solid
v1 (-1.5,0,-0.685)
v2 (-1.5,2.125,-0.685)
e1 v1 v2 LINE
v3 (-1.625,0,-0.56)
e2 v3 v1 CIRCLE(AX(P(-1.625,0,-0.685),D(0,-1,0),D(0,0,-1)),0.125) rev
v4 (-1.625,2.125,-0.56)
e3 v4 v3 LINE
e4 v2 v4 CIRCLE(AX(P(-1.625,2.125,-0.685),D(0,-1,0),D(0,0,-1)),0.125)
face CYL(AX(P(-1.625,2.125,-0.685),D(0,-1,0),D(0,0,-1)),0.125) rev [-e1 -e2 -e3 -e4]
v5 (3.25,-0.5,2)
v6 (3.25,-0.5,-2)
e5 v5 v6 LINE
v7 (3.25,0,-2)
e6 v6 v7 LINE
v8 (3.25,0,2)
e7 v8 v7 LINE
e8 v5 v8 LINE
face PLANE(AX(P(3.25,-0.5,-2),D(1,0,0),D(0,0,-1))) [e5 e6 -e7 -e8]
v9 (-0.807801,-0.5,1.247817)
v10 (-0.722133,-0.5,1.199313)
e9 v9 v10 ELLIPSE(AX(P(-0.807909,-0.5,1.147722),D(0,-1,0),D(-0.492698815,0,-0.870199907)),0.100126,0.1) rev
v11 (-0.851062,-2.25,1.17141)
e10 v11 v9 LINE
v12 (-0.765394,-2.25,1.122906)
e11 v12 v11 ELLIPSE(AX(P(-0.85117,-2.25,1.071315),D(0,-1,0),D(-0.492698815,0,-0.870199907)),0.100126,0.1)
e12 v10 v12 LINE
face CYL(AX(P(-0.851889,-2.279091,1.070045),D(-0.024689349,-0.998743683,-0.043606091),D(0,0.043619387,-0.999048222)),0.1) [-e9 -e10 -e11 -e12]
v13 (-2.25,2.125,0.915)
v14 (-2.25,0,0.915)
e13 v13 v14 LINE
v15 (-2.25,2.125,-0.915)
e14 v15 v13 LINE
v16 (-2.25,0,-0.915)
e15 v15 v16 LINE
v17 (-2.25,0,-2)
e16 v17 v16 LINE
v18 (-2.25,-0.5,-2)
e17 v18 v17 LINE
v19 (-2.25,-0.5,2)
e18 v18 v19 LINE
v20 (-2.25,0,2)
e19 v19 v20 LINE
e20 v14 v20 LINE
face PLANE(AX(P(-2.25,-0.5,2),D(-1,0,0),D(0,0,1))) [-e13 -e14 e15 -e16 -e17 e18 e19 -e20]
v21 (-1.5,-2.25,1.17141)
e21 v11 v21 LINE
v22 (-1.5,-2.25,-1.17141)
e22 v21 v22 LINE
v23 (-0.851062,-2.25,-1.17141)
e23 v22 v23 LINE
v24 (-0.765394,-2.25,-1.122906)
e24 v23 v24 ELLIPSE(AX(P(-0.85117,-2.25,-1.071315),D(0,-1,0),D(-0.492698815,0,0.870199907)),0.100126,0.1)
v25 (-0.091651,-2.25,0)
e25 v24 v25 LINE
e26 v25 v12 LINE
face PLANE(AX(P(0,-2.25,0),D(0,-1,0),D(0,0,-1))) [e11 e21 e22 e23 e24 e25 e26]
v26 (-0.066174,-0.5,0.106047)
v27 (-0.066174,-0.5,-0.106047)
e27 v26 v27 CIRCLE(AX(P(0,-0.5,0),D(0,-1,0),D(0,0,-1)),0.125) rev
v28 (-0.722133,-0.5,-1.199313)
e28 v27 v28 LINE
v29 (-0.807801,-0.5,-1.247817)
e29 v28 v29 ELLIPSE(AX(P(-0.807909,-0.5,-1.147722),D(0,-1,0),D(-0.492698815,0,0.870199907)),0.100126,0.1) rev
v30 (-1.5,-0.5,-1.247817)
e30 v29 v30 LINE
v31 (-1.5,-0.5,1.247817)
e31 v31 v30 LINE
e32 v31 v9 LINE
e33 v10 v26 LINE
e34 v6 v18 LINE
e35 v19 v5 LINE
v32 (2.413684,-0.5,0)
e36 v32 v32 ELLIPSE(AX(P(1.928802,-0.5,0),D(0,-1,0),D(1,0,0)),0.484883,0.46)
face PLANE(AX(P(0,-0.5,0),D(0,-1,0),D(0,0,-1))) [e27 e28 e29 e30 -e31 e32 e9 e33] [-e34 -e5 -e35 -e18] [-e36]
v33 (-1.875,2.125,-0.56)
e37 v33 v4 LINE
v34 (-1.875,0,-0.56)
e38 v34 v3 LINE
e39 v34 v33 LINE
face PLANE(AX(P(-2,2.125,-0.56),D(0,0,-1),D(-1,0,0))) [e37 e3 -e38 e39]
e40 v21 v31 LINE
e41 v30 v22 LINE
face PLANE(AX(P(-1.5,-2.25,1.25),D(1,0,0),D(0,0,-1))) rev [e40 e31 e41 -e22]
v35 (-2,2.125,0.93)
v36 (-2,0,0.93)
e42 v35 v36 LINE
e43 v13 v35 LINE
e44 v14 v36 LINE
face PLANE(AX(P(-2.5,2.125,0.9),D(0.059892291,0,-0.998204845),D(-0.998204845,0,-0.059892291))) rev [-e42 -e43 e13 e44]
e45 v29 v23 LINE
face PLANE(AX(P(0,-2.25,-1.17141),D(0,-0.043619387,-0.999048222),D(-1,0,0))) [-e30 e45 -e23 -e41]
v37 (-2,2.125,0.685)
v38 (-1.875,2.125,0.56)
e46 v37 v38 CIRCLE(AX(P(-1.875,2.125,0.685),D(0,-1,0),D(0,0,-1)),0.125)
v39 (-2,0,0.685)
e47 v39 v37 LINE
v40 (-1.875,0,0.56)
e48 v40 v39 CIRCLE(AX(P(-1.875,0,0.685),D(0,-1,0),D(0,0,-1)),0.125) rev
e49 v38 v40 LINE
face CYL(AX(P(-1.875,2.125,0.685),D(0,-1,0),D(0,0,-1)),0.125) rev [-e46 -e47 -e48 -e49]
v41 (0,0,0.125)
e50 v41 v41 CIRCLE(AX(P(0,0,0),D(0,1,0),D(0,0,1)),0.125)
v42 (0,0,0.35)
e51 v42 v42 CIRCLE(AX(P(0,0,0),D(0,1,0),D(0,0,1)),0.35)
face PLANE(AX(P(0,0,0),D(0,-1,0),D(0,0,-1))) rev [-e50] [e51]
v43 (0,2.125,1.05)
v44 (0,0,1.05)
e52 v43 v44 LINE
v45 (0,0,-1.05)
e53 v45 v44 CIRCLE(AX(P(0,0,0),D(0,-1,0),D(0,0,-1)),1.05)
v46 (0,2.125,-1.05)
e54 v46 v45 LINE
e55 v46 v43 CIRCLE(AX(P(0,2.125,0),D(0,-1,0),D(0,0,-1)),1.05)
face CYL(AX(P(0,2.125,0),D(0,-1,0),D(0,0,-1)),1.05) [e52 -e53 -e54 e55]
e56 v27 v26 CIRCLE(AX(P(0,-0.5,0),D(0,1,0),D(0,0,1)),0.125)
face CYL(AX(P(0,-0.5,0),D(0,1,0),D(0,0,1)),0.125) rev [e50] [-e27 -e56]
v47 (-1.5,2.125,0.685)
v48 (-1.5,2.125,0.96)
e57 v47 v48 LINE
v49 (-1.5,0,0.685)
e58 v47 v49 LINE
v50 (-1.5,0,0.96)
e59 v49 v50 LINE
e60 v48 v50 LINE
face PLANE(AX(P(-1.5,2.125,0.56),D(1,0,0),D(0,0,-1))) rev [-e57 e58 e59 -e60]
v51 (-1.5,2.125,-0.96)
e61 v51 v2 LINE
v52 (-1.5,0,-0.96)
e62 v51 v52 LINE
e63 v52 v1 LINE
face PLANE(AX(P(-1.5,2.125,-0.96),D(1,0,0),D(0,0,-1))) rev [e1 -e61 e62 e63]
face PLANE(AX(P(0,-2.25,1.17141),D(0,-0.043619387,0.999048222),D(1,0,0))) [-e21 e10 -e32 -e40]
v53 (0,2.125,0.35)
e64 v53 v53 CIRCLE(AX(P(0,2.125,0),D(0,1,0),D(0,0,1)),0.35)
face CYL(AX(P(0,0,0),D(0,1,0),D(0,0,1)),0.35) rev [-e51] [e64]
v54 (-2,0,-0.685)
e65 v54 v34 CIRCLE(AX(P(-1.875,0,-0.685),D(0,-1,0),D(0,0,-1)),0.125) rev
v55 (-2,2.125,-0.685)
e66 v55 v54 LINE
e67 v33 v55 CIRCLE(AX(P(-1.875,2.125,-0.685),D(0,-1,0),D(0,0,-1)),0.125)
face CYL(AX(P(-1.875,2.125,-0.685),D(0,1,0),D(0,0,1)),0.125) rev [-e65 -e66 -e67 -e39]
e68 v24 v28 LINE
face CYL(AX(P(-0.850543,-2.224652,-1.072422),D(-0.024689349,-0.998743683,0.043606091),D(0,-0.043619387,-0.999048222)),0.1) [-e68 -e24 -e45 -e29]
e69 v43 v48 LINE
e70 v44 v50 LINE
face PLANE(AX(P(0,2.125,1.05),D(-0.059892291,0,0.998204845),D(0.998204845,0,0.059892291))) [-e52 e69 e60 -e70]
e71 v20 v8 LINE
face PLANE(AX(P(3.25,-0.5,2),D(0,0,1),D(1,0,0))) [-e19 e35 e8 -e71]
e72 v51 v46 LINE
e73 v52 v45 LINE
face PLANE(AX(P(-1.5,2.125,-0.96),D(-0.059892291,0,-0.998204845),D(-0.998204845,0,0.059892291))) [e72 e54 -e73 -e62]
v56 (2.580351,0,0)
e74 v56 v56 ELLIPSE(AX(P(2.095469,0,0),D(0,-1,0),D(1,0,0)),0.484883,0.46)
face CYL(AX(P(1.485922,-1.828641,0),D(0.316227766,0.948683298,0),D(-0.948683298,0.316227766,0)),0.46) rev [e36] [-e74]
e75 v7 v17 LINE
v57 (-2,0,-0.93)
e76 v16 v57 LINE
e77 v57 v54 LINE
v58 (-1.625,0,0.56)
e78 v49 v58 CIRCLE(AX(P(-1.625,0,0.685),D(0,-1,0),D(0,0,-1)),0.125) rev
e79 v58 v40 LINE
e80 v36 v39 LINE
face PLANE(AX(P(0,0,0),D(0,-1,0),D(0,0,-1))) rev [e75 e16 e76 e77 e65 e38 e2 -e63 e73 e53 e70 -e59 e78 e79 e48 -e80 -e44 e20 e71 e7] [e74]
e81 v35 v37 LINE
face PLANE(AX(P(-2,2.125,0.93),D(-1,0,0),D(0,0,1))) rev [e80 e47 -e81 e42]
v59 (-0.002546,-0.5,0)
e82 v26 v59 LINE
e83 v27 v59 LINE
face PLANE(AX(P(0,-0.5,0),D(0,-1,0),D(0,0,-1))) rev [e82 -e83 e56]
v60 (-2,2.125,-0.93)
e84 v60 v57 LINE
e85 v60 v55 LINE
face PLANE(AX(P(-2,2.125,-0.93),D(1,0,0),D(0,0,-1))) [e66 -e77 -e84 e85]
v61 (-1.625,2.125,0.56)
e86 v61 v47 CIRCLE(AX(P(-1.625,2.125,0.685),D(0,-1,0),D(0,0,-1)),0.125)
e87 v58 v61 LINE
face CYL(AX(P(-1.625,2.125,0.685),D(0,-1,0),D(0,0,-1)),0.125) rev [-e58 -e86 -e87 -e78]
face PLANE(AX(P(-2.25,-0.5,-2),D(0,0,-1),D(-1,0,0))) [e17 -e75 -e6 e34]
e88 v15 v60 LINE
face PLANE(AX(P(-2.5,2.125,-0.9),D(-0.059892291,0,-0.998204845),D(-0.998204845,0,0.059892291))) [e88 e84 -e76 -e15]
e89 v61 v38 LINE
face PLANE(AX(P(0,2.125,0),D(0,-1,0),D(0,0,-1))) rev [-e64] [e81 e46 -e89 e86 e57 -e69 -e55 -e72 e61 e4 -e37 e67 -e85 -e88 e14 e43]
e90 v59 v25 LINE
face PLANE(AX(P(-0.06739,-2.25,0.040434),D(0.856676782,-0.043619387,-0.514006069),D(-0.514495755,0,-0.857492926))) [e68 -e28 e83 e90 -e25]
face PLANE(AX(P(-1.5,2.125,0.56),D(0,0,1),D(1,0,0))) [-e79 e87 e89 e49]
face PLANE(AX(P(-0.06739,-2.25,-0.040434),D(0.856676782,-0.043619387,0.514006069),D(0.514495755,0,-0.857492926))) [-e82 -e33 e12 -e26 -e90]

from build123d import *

# Parameters (mm, degrees)
BOSS_EXTRUDE1_DEPTH     = 2.125
SKETCH4_R               = 0.35
THROUGH_HOLES_DEPTH     = 4.445014514
FILLET1_R               = 0.125
SKETCH5_R               = 0.125
BOSS_EXTRUDE2_DEPTH     = 0.5
SKETCH8_R               = 0.46
CUT_EXTRUDE1_DEPTH      = 5.582575695
CUT_EXTRUDE2_DEPTH      = 5.367851302
CUT_EXTRUDE2_DEPTH_BACK = 5.367851302
SKETCH9_W               = 1.465031661
SKETCH9_H               = 4
BOSS_EXTRUDE3_DEPTH     = 1.75
CHAMFER1_SIZE           = 1.8
CHAMFER1_SIZE_2         = 0.078589697
FILLET2_R               = 0.1


with BuildPart() as part:
    # Sketch3 → Boss-Extrude1 (new body)
    with BuildSketch(Plane(origin=(0, 0, 0), x_dir=(1, 0, 0), z_dir=(0, 1, 0))):
        with BuildLine():
            Line((-2.5, 0.9), (-2, 0.93))
            Line((-2, 0.93), (-2, 0.56))
            Line((-2, 0.56), (-1.5, 0.56))
            Line((-1.5, 0.56), (-1.5, 0.96))
            Line((-1.5, 0.96), (0, 1.05))
            ThreePointArc((0, 1.05), (1.05, 0), (0, -1.05))
            Line((0, -1.05), (-1.5, -0.96))
            Line((-1.5, -0.96), (-1.5, -0.56))
            Line((-1.5, -0.56), (-2, -0.56))
            Line((-2, -0.56), (-2, -0.93))
            Line((-2, -0.93), (-2.5, -0.9))
            Line((-2.5, -0.9), (-2.5, 0.9))
        make_face()
    extrude(amount=BOSS_EXTRUDE1_DEPTH)

    # Sketch4 → Through Holes (cut, through all)
    with BuildSketch(Plane(origin=(0, 2.125, 0), x_dir=(1, 0, 0), z_dir=(0, 1, 0))):
        with Locations(Location((0, 0, 0), (0, 0, 270))):
            Circle(SKETCH4_R)
    extrude(amount=-THROUGH_HOLES_DEPTH, mode=Mode.SUBTRACT)

    # Fillet1
    fillet1_edges = [part.edges().sort_by_distance(p)[0] for p in [
        (-2, 1.0625, -0.56),
        (-1.5, 1.0625, -0.56),
        (-1.5, 1.0625, 0.56),
        (-2, 1.0625, 0.56),
    ]]
    fillet(fillet1_edges, radius=FILLET1_R)

    # Sketch5 → Boss-Extrude2 (add)
    with BuildSketch(Plane(origin=(0, 0, 0), x_dir=(1, 0, 0), z_dir=(0, 1, 0))):
        Polygon((-2.25, -2), (1.75, -2), (3.25, -2), (3.25, 2), (1.75, 2), (-2.25, 2), align=None)
        with Locations(Location((0, 0, 0), (0, 0, 270))):
            Circle(SKETCH5_R, mode=Mode.SUBTRACT)
    extrude(amount=-BOSS_EXTRUDE2_DEPTH)

    # Sketch8 → Cut-Extrude1 (cut, through all)
    with BuildSketch(Plane(origin=(0.7, 2.1, 0), x_dir=(0.948683298050514, -0.3162277660168378, 0), z_dir=(0.3162277660168378, 0.948683298050514, 0))):
        with Locations((1.987936011, 0)):
            Circle(SKETCH8_R)
    extrude(amount=-CUT_EXTRUDE1_DEPTH, mode=Mode.SUBTRACT)

    # Sketch9 → Cut-Extrude2 (cut, two sides: drawn at the far end of the back side and taken through both)
    with BuildSketch(Plane.XZ.offset(-CUT_EXTRUDE2_DEPTH_BACK)):
        with Locations((-2.982515831, 0)):
            Rectangle(SKETCH9_W, SKETCH9_H)
    extrude(amount=CUT_EXTRUDE2_DEPTH + CUT_EXTRUDE2_DEPTH_BACK, mode=Mode.SUBTRACT)

    # Sketch10 → Boss-Extrude3 (add)
    with BuildSketch(Plane.XZ.offset(0.5)):
        Polygon((-1.5, 1.25), (-1.5, -1.25), (-0.75, -1.25), (0, 0), (-0.75, 1.25), align=None)
    extrude(amount=BOSS_EXTRUDE3_DEPTH)

    # Chamfer1
    # the kernel refuses this chamfer: 1.8, 0.078589697 mm, written as the material it takes off along each edge
    with BuildSketch(Plane(origin=(-6.179835266, -2.25, -1.25), x_dir=(0, 0.999998592613724, -0.0016777278000430623), z_dir=(1, 0, 0))) as chamfer1_piece_1_section:
        Polygon((CHAMFER1_SIZE * 0.999998592614, CHAMFER1_SIZE * 0.00167772780004), (-CHAMFER1_SIZE_2 * 0.00167772780507, CHAMFER1_SIZE_2 * 0.999998595608), (0, 0), align=None)
    chamfer1_piece_1 = extrude(amount=10.109670532, mode=Mode.PRIVATE)
    chamfer1_piece_1 = split(chamfer1_piece_1, bisect_by=Plane(origin=(-1.125, -0.5, -1.243941513), z_dir=(0, -1, 0)), keep=Keep.TOP, mode=Mode.PRIVATE)
    add(chamfer1_piece_1, mode=Mode.SUBTRACT)
    with BuildSketch(Plane(origin=(-3.157755381, -2.25, -5.262925634), x_dir=(0.0014386397198082417, 0.9999985926137243, -0.0008631838318849449), z_dir=(0.5144957554275265, 0, 0.8574929257125442))) as chamfer1_piece_2_section:
        Polygon((CHAMFER1_SIZE * 0.999998592614, CHAMFER1_SIZE * 0.00167772780004), (-CHAMFER1_SIZE_2 * 0.00167772780507, CHAMFER1_SIZE_2 * 0.999998595608), (0, 0), align=None)
    chamfer1_piece_2 = extrude(amount=10.817408506, mode=Mode.PRIVATE)
    chamfer1_piece_2 = split(chamfer1_piece_2, bisect_by=Plane(origin=(-0.38019511, -0.5, -0.621882934), z_dir=(0, -1, 0)), keep=Keep.TOP, mode=Mode.PRIVATE)
    add(chamfer1_piece_2, mode=Mode.SUBTRACT)
    with BuildSketch(Plane(origin=(2.407755381, -2.25, -4.012925634), x_dir=(0.0014386397198082065, 0.9999985926137243, 0.0008631838318849242), z_dir=(-0.5144957554275267, 0, 0.8574929257125442))) as chamfer1_piece_3_section:
        Polygon((CHAMFER1_SIZE * 0.999998592614, CHAMFER1_SIZE * 0.00167772780004), (-CHAMFER1_SIZE_2 * 0.00167772780507, CHAMFER1_SIZE_2 * 0.999998595608), (0, 0), align=None)
    chamfer1_piece_3 = extrude(amount=10.817408506, mode=Mode.PRIVATE)
    chamfer1_piece_3 = split(chamfer1_piece_3, bisect_by=Plane(origin=(-0.38019511, -0.5, 0.621882934), z_dir=(0, -1, 0)), keep=Keep.TOP, mode=Mode.PRIVATE)
    add(chamfer1_piece_3, mode=Mode.SUBTRACT)
    with BuildSketch(Plane(origin=(3.929835266, -2.25, 1.25), x_dir=(0, 0.999998592613724, 0.0016777278000430623), z_dir=(-1, 0, 0))) as chamfer1_piece_4_section:
        Polygon((CHAMFER1_SIZE * 0.999998592614, CHAMFER1_SIZE * 0.00167772780004), (-CHAMFER1_SIZE_2 * 0.00167772780507, CHAMFER1_SIZE_2 * 0.999998595608), (0, 0), align=None)
    chamfer1_piece_4 = extrude(amount=10.109670532, mode=Mode.PRIVATE)
    chamfer1_piece_4 = split(chamfer1_piece_4, bisect_by=Plane(origin=(-1.125, -0.5, 1.243941513), z_dir=(0, -1, 0)), keep=Keep.TOP, mode=Mode.PRIVATE)
    add(chamfer1_piece_4, mode=Mode.SUBTRACT)

    # Fillet2
    fillet2_edges = [part.edges().sort_by_distance(p)[0] for p in [
        (-0.772866375, -1.375, 1.209613628),
        (-0.772866375, -1.375, -1.209613628),
    ]]
    fillet(fillet2_edges, radius=FILLET2_R)


solid = part.part
